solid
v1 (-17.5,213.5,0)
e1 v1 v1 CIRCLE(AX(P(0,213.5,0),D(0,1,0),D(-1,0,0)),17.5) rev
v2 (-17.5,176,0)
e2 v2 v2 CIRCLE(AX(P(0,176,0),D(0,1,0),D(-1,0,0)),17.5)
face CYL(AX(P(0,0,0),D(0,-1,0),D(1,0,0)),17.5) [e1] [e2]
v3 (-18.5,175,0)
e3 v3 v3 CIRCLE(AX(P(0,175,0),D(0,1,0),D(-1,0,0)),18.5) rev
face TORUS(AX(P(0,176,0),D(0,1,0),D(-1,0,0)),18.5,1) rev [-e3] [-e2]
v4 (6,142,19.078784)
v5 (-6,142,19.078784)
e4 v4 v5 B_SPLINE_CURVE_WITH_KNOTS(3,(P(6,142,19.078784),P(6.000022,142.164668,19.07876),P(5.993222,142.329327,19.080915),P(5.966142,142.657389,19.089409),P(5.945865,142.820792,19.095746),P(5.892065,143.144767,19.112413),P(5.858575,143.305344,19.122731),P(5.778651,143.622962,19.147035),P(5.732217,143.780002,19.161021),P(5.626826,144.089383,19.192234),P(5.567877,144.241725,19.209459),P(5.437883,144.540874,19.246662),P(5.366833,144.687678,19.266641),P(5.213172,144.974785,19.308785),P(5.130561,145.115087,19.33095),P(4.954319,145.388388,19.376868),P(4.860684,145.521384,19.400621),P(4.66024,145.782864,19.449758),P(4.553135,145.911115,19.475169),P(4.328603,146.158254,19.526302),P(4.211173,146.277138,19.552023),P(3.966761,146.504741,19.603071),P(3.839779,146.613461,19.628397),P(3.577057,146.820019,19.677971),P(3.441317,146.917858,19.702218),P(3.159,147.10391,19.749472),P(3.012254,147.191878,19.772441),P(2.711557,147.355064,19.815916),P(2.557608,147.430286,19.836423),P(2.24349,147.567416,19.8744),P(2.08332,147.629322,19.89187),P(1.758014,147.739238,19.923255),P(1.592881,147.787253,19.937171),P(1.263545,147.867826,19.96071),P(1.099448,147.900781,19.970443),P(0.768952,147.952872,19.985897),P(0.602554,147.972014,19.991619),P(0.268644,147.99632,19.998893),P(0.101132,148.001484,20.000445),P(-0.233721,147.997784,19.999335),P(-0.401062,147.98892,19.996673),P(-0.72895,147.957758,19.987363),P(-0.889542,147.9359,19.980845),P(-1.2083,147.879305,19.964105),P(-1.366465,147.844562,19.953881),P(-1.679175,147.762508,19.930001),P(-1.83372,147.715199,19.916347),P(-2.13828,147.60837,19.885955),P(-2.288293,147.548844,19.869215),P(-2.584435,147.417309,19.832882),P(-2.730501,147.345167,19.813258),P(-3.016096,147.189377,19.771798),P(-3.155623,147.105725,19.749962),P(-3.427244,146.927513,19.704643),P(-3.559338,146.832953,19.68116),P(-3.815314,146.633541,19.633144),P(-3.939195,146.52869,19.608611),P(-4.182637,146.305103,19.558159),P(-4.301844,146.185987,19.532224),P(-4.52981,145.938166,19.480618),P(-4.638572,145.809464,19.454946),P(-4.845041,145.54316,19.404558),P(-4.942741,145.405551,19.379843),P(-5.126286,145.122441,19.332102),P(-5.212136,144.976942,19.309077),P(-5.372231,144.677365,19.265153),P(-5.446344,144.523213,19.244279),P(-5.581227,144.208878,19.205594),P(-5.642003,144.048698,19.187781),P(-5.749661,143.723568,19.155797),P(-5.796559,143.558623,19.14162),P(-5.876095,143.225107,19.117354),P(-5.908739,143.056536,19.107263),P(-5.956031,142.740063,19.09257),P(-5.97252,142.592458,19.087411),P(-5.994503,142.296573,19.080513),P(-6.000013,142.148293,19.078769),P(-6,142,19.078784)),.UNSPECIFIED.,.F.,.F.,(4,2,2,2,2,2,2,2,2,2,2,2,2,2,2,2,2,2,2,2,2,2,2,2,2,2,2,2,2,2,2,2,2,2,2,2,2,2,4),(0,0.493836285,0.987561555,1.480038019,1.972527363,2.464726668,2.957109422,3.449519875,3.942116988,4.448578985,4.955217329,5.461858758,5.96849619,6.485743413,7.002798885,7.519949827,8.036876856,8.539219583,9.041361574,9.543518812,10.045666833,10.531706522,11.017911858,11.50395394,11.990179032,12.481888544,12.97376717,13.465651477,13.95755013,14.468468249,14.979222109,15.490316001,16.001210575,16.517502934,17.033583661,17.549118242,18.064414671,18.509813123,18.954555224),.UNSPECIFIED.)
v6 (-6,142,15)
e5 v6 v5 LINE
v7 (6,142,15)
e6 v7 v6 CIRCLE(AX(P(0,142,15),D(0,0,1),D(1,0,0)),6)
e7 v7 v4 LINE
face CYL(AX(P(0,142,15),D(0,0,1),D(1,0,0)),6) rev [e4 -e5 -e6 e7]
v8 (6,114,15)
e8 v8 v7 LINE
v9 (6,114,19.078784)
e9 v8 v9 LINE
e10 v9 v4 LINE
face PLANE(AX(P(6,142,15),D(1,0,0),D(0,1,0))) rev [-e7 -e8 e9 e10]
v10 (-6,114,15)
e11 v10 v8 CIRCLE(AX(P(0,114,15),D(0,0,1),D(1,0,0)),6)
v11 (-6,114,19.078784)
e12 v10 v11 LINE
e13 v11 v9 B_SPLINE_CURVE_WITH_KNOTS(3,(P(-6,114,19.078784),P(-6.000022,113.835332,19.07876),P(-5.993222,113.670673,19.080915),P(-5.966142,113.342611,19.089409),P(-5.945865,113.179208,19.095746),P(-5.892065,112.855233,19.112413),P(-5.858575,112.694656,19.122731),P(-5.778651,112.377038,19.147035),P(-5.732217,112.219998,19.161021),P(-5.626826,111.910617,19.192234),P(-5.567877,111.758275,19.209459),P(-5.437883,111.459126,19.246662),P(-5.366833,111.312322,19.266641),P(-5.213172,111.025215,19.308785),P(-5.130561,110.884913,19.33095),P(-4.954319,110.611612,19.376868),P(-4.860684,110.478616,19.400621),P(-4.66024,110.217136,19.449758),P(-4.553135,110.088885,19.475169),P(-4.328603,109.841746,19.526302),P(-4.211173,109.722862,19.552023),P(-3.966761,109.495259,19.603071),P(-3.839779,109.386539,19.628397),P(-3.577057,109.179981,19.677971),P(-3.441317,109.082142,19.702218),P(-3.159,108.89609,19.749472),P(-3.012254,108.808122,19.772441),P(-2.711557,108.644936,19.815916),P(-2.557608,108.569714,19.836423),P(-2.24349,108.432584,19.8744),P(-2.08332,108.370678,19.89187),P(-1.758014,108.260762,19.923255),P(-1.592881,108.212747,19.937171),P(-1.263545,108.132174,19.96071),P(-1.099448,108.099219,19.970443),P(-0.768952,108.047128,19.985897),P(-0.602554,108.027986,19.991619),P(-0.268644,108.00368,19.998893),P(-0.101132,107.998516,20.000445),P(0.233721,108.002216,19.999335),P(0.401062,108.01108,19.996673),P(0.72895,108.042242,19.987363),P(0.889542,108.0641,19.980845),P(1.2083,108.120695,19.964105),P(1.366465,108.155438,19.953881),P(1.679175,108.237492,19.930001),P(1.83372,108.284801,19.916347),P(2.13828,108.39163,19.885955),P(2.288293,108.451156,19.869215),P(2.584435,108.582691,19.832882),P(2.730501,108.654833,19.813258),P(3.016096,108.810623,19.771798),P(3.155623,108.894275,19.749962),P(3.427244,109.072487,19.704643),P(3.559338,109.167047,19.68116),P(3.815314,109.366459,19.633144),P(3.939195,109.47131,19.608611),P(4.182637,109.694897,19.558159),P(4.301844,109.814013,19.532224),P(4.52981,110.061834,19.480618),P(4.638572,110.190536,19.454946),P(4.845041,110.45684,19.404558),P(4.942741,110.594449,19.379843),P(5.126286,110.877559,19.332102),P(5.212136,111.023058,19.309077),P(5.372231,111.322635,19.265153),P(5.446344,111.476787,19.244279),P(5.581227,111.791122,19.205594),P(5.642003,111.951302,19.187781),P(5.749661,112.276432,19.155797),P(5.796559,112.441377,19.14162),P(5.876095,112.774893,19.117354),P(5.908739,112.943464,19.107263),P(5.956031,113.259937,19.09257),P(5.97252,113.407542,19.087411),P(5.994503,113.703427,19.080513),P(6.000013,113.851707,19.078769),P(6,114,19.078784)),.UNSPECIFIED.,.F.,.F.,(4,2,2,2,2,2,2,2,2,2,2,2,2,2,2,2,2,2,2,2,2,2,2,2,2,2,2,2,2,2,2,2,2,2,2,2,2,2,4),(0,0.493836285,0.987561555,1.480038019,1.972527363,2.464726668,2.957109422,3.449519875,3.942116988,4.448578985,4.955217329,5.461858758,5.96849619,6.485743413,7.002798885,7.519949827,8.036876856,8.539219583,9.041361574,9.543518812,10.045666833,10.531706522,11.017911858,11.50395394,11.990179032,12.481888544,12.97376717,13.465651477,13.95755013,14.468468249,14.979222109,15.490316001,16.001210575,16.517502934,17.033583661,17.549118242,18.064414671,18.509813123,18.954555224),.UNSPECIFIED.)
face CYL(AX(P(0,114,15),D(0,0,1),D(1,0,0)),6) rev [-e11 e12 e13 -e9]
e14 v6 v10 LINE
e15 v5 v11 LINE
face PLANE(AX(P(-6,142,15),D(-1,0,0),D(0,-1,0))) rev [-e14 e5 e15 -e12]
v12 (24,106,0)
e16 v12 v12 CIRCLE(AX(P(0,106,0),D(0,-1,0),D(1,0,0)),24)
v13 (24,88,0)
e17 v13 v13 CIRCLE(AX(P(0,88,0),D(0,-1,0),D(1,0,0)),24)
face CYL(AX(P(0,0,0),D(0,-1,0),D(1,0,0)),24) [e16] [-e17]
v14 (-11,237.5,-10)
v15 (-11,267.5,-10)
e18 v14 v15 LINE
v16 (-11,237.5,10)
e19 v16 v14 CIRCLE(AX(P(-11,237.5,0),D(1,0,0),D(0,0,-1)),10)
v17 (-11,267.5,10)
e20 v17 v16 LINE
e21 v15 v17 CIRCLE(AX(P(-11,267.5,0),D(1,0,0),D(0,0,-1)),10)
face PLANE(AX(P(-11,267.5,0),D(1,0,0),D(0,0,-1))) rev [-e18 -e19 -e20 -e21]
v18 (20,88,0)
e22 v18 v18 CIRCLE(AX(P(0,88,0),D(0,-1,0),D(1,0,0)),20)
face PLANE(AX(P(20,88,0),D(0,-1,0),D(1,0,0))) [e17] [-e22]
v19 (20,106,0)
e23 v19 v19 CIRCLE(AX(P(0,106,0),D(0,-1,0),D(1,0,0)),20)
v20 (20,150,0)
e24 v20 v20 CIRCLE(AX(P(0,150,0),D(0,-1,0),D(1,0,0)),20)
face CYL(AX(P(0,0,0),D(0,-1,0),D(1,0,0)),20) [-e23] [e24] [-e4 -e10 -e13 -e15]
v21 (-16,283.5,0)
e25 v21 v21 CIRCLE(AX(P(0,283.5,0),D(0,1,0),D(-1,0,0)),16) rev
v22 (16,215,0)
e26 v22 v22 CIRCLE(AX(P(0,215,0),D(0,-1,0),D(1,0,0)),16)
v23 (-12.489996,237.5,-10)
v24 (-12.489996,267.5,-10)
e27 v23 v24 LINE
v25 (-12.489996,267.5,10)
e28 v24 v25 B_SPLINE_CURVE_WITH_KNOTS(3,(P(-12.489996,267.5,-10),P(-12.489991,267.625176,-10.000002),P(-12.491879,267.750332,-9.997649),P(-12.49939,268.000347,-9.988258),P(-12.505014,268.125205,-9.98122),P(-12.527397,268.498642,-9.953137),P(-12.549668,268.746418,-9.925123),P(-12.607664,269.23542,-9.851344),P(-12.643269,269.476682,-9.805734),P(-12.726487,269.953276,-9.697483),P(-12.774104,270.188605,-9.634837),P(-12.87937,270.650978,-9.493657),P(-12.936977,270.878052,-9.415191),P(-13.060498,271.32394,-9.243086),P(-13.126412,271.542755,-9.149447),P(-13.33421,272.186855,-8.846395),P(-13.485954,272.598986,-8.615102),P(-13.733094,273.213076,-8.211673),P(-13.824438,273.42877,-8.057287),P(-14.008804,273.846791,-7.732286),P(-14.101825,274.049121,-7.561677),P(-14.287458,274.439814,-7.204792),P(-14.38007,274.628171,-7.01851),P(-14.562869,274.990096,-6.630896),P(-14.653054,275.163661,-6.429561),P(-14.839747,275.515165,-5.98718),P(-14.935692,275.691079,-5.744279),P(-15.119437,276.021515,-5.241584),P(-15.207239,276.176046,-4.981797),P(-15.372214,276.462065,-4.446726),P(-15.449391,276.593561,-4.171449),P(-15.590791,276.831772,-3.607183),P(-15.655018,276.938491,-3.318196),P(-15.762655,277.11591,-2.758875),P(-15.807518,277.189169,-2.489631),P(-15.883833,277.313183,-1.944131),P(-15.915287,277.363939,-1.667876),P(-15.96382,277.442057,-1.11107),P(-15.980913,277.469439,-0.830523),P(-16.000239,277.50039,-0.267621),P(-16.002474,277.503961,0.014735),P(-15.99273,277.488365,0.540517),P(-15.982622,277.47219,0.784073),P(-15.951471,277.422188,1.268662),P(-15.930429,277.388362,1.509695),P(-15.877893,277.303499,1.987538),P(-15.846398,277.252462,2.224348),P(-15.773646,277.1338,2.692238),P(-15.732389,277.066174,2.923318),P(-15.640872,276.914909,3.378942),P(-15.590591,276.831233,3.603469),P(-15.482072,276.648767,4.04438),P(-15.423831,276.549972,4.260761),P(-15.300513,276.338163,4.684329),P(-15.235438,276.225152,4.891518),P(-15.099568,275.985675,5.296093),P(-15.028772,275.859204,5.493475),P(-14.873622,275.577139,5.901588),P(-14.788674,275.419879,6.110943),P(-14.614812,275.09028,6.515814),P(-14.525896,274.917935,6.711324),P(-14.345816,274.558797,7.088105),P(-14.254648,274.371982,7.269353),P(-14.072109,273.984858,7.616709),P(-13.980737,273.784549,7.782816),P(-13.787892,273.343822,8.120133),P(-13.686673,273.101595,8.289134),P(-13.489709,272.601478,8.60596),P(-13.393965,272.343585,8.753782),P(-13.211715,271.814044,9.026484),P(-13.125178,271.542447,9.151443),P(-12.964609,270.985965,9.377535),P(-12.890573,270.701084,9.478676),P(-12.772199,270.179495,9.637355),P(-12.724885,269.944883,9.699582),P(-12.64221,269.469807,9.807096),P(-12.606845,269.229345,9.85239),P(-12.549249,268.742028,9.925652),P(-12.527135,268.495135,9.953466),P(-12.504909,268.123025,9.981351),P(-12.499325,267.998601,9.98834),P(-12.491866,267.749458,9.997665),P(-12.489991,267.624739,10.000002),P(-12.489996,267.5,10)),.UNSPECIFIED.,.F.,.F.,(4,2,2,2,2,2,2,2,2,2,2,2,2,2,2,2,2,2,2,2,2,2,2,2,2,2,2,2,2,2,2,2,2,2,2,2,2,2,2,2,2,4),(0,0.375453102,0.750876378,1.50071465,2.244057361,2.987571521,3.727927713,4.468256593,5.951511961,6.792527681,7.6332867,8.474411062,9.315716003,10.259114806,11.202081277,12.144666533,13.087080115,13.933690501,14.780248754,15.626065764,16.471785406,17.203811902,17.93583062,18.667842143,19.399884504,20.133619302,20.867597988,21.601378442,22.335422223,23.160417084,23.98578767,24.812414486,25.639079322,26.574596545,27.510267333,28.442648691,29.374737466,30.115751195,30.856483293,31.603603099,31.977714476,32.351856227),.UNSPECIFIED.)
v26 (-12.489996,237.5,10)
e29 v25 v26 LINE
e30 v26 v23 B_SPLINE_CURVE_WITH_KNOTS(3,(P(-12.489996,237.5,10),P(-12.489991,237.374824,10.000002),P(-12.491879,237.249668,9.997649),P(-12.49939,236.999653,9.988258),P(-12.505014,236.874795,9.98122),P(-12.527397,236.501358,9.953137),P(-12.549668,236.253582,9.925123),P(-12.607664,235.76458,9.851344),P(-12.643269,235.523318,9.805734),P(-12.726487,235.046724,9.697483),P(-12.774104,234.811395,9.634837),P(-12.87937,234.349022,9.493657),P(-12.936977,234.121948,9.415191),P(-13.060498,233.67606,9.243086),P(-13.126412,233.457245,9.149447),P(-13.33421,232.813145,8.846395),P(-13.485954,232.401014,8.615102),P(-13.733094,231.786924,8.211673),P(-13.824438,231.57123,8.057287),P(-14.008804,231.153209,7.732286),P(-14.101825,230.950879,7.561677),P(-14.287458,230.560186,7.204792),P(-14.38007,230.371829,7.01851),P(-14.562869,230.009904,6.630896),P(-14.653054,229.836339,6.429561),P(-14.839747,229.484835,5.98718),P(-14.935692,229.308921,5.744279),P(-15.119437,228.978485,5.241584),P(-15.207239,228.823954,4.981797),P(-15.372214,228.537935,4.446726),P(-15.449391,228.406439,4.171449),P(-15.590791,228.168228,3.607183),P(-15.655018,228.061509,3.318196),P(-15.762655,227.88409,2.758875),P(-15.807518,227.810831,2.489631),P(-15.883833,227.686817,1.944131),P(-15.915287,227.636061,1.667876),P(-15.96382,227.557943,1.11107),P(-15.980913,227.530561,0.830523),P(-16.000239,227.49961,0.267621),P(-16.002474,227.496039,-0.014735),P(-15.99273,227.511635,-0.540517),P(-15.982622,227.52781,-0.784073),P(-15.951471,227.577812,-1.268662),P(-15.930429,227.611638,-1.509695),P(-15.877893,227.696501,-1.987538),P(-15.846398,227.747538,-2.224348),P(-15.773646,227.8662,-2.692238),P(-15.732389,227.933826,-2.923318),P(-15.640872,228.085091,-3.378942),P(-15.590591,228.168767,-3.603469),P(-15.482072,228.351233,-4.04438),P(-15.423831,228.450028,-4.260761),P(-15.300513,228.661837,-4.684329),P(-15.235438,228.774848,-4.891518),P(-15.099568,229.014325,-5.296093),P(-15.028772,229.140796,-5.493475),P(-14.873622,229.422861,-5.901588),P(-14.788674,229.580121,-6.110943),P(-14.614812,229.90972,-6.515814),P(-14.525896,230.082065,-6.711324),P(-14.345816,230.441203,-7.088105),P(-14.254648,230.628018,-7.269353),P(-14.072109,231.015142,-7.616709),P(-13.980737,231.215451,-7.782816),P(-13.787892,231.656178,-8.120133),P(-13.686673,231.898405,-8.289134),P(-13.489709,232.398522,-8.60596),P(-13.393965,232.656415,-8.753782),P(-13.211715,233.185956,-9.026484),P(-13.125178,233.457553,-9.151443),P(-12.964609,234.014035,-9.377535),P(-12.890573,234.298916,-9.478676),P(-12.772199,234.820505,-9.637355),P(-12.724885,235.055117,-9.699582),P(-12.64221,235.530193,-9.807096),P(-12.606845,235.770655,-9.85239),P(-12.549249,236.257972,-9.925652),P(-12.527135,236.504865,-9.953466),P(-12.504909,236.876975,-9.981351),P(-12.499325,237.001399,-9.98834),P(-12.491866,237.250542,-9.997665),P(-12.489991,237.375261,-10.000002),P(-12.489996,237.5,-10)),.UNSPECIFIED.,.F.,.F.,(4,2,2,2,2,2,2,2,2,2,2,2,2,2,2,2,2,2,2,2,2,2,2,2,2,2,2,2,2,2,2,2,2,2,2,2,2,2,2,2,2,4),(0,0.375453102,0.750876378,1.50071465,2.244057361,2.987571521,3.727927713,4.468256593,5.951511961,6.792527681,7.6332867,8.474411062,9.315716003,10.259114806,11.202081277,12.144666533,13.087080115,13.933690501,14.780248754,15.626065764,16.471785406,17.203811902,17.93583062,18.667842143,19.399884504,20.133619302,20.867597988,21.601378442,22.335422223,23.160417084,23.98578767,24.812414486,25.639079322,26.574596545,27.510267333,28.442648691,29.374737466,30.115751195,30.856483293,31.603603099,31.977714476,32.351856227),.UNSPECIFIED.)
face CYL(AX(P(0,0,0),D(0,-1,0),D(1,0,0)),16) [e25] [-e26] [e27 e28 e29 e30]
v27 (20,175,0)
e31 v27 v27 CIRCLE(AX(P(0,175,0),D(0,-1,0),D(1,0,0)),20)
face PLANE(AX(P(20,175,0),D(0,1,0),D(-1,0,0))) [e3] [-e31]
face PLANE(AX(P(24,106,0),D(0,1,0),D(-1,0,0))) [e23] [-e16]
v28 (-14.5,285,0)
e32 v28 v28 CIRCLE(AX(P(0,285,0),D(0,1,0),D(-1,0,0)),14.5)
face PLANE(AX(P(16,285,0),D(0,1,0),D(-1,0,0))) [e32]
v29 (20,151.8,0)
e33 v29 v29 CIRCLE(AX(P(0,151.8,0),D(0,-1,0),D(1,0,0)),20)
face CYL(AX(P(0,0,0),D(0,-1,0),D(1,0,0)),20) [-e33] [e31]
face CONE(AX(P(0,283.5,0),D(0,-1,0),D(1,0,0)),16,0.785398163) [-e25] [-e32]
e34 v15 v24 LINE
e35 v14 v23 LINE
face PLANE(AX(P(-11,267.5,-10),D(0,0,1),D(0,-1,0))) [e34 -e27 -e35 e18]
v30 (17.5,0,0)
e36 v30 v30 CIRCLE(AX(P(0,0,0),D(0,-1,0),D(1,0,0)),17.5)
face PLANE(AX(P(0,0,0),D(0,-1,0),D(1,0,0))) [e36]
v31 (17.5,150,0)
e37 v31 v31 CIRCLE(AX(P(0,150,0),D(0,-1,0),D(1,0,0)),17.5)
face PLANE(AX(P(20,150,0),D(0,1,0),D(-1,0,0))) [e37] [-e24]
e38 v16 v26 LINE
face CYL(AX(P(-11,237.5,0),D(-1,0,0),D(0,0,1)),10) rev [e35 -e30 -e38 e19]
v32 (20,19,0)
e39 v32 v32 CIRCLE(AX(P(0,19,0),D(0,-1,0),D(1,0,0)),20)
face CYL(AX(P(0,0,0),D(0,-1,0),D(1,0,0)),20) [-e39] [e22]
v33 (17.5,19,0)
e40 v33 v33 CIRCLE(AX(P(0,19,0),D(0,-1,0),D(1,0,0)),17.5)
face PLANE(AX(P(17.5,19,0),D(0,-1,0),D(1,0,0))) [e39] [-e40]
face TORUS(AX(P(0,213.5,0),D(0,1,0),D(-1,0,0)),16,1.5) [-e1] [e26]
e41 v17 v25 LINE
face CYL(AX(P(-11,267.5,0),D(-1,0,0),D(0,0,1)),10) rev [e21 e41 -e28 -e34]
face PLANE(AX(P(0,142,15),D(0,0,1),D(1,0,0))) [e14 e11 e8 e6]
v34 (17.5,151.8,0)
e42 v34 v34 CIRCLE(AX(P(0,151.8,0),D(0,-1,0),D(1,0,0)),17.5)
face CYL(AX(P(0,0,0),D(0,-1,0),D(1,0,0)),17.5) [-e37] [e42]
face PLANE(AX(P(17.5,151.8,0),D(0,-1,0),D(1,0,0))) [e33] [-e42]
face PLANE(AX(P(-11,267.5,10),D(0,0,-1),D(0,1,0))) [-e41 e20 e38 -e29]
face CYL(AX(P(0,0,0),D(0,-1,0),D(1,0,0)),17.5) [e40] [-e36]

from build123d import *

# Parameters (mm, degrees)
CHAMFER1_SIZE      = 1.5
FILLET2_R          = 1.5
CUT_EXTRUDE1_DEPTH = 5
CUT_EXTRUDE2_DEPTH = 5
FILLET4_R          = 1


with BuildPart() as part:
    # Sketch1 → Revolve1 (revolve)
    with BuildSketch(Plane.XY):
        Polygon((0, 0), (17.5, 0), (17.5, 19), (20, 19), (20, 88), (24, 88), (24, 106), (20, 106), (20, 150), (17.5, 150), (17.5, 151.8), (20, 151.8), (20, 175), (17.5, 175), (17.5, 215), (16, 215), (16, 285), (0, 285), align=None)
    revolve(axis=Axis((0, 0, 0), (0, 1, 0)))

    # Chamfer1
    chamfer1_edges = [part.edges().sort_by_distance(p)[0] for p in [
        (-16, 285, 0),
    ]]
    chamfer(chamfer1_edges, length=CHAMFER1_SIZE)

    # Fillet2
    fillet2_edges = [part.edges().sort_by_distance(p)[0] for p in [
        (-17.5, 215, 0),
    ]]
    fillet(fillet2_edges, radius=FILLET2_R - 0.0001)  # a hair under: the kernel refuses the full size

    # Sketch3 → Cut-Extrude1 (cut)
    with BuildSketch(Plane.XY.offset(20)):
        with BuildLine():
            Line((6, 142), (6, 114))
            ThreePointArc((6, 114), (0, 108), (-6, 114))
            Line((-6, 114), (-6, 142))
            ThreePointArc((-6, 142), (0, 148), (6, 142))
        make_face()
    extrude(amount=-CUT_EXTRUDE1_DEPTH, mode=Mode.SUBTRACT)

    # Sketch4 → Cut-Extrude2 (cut)
    with BuildSketch(Plane(origin=(-16, 0, 0), x_dir=(0, 0, -1), z_dir=(1, 0, 0))):
        with BuildLine():
            Line((10, 267.5), (10, 237.5))
            ThreePointArc((10, 237.5), (0, 227.5), (-10, 237.5))
            Line((-10, 237.5), (-10, 267.5))
            ThreePointArc((-10, 267.5), (0, 277.5), (10, 267.5))
        make_face()
    extrude(amount=CUT_EXTRUDE2_DEPTH, mode=Mode.SUBTRACT)

    # Fillet4
    fillet4_edges = [part.edges().sort_by_distance(p)[0] for p in [
        (-17.5, 175, 0),
    ]]
    fillet(fillet4_edges, radius=FILLET4_R)


solid = part.part
